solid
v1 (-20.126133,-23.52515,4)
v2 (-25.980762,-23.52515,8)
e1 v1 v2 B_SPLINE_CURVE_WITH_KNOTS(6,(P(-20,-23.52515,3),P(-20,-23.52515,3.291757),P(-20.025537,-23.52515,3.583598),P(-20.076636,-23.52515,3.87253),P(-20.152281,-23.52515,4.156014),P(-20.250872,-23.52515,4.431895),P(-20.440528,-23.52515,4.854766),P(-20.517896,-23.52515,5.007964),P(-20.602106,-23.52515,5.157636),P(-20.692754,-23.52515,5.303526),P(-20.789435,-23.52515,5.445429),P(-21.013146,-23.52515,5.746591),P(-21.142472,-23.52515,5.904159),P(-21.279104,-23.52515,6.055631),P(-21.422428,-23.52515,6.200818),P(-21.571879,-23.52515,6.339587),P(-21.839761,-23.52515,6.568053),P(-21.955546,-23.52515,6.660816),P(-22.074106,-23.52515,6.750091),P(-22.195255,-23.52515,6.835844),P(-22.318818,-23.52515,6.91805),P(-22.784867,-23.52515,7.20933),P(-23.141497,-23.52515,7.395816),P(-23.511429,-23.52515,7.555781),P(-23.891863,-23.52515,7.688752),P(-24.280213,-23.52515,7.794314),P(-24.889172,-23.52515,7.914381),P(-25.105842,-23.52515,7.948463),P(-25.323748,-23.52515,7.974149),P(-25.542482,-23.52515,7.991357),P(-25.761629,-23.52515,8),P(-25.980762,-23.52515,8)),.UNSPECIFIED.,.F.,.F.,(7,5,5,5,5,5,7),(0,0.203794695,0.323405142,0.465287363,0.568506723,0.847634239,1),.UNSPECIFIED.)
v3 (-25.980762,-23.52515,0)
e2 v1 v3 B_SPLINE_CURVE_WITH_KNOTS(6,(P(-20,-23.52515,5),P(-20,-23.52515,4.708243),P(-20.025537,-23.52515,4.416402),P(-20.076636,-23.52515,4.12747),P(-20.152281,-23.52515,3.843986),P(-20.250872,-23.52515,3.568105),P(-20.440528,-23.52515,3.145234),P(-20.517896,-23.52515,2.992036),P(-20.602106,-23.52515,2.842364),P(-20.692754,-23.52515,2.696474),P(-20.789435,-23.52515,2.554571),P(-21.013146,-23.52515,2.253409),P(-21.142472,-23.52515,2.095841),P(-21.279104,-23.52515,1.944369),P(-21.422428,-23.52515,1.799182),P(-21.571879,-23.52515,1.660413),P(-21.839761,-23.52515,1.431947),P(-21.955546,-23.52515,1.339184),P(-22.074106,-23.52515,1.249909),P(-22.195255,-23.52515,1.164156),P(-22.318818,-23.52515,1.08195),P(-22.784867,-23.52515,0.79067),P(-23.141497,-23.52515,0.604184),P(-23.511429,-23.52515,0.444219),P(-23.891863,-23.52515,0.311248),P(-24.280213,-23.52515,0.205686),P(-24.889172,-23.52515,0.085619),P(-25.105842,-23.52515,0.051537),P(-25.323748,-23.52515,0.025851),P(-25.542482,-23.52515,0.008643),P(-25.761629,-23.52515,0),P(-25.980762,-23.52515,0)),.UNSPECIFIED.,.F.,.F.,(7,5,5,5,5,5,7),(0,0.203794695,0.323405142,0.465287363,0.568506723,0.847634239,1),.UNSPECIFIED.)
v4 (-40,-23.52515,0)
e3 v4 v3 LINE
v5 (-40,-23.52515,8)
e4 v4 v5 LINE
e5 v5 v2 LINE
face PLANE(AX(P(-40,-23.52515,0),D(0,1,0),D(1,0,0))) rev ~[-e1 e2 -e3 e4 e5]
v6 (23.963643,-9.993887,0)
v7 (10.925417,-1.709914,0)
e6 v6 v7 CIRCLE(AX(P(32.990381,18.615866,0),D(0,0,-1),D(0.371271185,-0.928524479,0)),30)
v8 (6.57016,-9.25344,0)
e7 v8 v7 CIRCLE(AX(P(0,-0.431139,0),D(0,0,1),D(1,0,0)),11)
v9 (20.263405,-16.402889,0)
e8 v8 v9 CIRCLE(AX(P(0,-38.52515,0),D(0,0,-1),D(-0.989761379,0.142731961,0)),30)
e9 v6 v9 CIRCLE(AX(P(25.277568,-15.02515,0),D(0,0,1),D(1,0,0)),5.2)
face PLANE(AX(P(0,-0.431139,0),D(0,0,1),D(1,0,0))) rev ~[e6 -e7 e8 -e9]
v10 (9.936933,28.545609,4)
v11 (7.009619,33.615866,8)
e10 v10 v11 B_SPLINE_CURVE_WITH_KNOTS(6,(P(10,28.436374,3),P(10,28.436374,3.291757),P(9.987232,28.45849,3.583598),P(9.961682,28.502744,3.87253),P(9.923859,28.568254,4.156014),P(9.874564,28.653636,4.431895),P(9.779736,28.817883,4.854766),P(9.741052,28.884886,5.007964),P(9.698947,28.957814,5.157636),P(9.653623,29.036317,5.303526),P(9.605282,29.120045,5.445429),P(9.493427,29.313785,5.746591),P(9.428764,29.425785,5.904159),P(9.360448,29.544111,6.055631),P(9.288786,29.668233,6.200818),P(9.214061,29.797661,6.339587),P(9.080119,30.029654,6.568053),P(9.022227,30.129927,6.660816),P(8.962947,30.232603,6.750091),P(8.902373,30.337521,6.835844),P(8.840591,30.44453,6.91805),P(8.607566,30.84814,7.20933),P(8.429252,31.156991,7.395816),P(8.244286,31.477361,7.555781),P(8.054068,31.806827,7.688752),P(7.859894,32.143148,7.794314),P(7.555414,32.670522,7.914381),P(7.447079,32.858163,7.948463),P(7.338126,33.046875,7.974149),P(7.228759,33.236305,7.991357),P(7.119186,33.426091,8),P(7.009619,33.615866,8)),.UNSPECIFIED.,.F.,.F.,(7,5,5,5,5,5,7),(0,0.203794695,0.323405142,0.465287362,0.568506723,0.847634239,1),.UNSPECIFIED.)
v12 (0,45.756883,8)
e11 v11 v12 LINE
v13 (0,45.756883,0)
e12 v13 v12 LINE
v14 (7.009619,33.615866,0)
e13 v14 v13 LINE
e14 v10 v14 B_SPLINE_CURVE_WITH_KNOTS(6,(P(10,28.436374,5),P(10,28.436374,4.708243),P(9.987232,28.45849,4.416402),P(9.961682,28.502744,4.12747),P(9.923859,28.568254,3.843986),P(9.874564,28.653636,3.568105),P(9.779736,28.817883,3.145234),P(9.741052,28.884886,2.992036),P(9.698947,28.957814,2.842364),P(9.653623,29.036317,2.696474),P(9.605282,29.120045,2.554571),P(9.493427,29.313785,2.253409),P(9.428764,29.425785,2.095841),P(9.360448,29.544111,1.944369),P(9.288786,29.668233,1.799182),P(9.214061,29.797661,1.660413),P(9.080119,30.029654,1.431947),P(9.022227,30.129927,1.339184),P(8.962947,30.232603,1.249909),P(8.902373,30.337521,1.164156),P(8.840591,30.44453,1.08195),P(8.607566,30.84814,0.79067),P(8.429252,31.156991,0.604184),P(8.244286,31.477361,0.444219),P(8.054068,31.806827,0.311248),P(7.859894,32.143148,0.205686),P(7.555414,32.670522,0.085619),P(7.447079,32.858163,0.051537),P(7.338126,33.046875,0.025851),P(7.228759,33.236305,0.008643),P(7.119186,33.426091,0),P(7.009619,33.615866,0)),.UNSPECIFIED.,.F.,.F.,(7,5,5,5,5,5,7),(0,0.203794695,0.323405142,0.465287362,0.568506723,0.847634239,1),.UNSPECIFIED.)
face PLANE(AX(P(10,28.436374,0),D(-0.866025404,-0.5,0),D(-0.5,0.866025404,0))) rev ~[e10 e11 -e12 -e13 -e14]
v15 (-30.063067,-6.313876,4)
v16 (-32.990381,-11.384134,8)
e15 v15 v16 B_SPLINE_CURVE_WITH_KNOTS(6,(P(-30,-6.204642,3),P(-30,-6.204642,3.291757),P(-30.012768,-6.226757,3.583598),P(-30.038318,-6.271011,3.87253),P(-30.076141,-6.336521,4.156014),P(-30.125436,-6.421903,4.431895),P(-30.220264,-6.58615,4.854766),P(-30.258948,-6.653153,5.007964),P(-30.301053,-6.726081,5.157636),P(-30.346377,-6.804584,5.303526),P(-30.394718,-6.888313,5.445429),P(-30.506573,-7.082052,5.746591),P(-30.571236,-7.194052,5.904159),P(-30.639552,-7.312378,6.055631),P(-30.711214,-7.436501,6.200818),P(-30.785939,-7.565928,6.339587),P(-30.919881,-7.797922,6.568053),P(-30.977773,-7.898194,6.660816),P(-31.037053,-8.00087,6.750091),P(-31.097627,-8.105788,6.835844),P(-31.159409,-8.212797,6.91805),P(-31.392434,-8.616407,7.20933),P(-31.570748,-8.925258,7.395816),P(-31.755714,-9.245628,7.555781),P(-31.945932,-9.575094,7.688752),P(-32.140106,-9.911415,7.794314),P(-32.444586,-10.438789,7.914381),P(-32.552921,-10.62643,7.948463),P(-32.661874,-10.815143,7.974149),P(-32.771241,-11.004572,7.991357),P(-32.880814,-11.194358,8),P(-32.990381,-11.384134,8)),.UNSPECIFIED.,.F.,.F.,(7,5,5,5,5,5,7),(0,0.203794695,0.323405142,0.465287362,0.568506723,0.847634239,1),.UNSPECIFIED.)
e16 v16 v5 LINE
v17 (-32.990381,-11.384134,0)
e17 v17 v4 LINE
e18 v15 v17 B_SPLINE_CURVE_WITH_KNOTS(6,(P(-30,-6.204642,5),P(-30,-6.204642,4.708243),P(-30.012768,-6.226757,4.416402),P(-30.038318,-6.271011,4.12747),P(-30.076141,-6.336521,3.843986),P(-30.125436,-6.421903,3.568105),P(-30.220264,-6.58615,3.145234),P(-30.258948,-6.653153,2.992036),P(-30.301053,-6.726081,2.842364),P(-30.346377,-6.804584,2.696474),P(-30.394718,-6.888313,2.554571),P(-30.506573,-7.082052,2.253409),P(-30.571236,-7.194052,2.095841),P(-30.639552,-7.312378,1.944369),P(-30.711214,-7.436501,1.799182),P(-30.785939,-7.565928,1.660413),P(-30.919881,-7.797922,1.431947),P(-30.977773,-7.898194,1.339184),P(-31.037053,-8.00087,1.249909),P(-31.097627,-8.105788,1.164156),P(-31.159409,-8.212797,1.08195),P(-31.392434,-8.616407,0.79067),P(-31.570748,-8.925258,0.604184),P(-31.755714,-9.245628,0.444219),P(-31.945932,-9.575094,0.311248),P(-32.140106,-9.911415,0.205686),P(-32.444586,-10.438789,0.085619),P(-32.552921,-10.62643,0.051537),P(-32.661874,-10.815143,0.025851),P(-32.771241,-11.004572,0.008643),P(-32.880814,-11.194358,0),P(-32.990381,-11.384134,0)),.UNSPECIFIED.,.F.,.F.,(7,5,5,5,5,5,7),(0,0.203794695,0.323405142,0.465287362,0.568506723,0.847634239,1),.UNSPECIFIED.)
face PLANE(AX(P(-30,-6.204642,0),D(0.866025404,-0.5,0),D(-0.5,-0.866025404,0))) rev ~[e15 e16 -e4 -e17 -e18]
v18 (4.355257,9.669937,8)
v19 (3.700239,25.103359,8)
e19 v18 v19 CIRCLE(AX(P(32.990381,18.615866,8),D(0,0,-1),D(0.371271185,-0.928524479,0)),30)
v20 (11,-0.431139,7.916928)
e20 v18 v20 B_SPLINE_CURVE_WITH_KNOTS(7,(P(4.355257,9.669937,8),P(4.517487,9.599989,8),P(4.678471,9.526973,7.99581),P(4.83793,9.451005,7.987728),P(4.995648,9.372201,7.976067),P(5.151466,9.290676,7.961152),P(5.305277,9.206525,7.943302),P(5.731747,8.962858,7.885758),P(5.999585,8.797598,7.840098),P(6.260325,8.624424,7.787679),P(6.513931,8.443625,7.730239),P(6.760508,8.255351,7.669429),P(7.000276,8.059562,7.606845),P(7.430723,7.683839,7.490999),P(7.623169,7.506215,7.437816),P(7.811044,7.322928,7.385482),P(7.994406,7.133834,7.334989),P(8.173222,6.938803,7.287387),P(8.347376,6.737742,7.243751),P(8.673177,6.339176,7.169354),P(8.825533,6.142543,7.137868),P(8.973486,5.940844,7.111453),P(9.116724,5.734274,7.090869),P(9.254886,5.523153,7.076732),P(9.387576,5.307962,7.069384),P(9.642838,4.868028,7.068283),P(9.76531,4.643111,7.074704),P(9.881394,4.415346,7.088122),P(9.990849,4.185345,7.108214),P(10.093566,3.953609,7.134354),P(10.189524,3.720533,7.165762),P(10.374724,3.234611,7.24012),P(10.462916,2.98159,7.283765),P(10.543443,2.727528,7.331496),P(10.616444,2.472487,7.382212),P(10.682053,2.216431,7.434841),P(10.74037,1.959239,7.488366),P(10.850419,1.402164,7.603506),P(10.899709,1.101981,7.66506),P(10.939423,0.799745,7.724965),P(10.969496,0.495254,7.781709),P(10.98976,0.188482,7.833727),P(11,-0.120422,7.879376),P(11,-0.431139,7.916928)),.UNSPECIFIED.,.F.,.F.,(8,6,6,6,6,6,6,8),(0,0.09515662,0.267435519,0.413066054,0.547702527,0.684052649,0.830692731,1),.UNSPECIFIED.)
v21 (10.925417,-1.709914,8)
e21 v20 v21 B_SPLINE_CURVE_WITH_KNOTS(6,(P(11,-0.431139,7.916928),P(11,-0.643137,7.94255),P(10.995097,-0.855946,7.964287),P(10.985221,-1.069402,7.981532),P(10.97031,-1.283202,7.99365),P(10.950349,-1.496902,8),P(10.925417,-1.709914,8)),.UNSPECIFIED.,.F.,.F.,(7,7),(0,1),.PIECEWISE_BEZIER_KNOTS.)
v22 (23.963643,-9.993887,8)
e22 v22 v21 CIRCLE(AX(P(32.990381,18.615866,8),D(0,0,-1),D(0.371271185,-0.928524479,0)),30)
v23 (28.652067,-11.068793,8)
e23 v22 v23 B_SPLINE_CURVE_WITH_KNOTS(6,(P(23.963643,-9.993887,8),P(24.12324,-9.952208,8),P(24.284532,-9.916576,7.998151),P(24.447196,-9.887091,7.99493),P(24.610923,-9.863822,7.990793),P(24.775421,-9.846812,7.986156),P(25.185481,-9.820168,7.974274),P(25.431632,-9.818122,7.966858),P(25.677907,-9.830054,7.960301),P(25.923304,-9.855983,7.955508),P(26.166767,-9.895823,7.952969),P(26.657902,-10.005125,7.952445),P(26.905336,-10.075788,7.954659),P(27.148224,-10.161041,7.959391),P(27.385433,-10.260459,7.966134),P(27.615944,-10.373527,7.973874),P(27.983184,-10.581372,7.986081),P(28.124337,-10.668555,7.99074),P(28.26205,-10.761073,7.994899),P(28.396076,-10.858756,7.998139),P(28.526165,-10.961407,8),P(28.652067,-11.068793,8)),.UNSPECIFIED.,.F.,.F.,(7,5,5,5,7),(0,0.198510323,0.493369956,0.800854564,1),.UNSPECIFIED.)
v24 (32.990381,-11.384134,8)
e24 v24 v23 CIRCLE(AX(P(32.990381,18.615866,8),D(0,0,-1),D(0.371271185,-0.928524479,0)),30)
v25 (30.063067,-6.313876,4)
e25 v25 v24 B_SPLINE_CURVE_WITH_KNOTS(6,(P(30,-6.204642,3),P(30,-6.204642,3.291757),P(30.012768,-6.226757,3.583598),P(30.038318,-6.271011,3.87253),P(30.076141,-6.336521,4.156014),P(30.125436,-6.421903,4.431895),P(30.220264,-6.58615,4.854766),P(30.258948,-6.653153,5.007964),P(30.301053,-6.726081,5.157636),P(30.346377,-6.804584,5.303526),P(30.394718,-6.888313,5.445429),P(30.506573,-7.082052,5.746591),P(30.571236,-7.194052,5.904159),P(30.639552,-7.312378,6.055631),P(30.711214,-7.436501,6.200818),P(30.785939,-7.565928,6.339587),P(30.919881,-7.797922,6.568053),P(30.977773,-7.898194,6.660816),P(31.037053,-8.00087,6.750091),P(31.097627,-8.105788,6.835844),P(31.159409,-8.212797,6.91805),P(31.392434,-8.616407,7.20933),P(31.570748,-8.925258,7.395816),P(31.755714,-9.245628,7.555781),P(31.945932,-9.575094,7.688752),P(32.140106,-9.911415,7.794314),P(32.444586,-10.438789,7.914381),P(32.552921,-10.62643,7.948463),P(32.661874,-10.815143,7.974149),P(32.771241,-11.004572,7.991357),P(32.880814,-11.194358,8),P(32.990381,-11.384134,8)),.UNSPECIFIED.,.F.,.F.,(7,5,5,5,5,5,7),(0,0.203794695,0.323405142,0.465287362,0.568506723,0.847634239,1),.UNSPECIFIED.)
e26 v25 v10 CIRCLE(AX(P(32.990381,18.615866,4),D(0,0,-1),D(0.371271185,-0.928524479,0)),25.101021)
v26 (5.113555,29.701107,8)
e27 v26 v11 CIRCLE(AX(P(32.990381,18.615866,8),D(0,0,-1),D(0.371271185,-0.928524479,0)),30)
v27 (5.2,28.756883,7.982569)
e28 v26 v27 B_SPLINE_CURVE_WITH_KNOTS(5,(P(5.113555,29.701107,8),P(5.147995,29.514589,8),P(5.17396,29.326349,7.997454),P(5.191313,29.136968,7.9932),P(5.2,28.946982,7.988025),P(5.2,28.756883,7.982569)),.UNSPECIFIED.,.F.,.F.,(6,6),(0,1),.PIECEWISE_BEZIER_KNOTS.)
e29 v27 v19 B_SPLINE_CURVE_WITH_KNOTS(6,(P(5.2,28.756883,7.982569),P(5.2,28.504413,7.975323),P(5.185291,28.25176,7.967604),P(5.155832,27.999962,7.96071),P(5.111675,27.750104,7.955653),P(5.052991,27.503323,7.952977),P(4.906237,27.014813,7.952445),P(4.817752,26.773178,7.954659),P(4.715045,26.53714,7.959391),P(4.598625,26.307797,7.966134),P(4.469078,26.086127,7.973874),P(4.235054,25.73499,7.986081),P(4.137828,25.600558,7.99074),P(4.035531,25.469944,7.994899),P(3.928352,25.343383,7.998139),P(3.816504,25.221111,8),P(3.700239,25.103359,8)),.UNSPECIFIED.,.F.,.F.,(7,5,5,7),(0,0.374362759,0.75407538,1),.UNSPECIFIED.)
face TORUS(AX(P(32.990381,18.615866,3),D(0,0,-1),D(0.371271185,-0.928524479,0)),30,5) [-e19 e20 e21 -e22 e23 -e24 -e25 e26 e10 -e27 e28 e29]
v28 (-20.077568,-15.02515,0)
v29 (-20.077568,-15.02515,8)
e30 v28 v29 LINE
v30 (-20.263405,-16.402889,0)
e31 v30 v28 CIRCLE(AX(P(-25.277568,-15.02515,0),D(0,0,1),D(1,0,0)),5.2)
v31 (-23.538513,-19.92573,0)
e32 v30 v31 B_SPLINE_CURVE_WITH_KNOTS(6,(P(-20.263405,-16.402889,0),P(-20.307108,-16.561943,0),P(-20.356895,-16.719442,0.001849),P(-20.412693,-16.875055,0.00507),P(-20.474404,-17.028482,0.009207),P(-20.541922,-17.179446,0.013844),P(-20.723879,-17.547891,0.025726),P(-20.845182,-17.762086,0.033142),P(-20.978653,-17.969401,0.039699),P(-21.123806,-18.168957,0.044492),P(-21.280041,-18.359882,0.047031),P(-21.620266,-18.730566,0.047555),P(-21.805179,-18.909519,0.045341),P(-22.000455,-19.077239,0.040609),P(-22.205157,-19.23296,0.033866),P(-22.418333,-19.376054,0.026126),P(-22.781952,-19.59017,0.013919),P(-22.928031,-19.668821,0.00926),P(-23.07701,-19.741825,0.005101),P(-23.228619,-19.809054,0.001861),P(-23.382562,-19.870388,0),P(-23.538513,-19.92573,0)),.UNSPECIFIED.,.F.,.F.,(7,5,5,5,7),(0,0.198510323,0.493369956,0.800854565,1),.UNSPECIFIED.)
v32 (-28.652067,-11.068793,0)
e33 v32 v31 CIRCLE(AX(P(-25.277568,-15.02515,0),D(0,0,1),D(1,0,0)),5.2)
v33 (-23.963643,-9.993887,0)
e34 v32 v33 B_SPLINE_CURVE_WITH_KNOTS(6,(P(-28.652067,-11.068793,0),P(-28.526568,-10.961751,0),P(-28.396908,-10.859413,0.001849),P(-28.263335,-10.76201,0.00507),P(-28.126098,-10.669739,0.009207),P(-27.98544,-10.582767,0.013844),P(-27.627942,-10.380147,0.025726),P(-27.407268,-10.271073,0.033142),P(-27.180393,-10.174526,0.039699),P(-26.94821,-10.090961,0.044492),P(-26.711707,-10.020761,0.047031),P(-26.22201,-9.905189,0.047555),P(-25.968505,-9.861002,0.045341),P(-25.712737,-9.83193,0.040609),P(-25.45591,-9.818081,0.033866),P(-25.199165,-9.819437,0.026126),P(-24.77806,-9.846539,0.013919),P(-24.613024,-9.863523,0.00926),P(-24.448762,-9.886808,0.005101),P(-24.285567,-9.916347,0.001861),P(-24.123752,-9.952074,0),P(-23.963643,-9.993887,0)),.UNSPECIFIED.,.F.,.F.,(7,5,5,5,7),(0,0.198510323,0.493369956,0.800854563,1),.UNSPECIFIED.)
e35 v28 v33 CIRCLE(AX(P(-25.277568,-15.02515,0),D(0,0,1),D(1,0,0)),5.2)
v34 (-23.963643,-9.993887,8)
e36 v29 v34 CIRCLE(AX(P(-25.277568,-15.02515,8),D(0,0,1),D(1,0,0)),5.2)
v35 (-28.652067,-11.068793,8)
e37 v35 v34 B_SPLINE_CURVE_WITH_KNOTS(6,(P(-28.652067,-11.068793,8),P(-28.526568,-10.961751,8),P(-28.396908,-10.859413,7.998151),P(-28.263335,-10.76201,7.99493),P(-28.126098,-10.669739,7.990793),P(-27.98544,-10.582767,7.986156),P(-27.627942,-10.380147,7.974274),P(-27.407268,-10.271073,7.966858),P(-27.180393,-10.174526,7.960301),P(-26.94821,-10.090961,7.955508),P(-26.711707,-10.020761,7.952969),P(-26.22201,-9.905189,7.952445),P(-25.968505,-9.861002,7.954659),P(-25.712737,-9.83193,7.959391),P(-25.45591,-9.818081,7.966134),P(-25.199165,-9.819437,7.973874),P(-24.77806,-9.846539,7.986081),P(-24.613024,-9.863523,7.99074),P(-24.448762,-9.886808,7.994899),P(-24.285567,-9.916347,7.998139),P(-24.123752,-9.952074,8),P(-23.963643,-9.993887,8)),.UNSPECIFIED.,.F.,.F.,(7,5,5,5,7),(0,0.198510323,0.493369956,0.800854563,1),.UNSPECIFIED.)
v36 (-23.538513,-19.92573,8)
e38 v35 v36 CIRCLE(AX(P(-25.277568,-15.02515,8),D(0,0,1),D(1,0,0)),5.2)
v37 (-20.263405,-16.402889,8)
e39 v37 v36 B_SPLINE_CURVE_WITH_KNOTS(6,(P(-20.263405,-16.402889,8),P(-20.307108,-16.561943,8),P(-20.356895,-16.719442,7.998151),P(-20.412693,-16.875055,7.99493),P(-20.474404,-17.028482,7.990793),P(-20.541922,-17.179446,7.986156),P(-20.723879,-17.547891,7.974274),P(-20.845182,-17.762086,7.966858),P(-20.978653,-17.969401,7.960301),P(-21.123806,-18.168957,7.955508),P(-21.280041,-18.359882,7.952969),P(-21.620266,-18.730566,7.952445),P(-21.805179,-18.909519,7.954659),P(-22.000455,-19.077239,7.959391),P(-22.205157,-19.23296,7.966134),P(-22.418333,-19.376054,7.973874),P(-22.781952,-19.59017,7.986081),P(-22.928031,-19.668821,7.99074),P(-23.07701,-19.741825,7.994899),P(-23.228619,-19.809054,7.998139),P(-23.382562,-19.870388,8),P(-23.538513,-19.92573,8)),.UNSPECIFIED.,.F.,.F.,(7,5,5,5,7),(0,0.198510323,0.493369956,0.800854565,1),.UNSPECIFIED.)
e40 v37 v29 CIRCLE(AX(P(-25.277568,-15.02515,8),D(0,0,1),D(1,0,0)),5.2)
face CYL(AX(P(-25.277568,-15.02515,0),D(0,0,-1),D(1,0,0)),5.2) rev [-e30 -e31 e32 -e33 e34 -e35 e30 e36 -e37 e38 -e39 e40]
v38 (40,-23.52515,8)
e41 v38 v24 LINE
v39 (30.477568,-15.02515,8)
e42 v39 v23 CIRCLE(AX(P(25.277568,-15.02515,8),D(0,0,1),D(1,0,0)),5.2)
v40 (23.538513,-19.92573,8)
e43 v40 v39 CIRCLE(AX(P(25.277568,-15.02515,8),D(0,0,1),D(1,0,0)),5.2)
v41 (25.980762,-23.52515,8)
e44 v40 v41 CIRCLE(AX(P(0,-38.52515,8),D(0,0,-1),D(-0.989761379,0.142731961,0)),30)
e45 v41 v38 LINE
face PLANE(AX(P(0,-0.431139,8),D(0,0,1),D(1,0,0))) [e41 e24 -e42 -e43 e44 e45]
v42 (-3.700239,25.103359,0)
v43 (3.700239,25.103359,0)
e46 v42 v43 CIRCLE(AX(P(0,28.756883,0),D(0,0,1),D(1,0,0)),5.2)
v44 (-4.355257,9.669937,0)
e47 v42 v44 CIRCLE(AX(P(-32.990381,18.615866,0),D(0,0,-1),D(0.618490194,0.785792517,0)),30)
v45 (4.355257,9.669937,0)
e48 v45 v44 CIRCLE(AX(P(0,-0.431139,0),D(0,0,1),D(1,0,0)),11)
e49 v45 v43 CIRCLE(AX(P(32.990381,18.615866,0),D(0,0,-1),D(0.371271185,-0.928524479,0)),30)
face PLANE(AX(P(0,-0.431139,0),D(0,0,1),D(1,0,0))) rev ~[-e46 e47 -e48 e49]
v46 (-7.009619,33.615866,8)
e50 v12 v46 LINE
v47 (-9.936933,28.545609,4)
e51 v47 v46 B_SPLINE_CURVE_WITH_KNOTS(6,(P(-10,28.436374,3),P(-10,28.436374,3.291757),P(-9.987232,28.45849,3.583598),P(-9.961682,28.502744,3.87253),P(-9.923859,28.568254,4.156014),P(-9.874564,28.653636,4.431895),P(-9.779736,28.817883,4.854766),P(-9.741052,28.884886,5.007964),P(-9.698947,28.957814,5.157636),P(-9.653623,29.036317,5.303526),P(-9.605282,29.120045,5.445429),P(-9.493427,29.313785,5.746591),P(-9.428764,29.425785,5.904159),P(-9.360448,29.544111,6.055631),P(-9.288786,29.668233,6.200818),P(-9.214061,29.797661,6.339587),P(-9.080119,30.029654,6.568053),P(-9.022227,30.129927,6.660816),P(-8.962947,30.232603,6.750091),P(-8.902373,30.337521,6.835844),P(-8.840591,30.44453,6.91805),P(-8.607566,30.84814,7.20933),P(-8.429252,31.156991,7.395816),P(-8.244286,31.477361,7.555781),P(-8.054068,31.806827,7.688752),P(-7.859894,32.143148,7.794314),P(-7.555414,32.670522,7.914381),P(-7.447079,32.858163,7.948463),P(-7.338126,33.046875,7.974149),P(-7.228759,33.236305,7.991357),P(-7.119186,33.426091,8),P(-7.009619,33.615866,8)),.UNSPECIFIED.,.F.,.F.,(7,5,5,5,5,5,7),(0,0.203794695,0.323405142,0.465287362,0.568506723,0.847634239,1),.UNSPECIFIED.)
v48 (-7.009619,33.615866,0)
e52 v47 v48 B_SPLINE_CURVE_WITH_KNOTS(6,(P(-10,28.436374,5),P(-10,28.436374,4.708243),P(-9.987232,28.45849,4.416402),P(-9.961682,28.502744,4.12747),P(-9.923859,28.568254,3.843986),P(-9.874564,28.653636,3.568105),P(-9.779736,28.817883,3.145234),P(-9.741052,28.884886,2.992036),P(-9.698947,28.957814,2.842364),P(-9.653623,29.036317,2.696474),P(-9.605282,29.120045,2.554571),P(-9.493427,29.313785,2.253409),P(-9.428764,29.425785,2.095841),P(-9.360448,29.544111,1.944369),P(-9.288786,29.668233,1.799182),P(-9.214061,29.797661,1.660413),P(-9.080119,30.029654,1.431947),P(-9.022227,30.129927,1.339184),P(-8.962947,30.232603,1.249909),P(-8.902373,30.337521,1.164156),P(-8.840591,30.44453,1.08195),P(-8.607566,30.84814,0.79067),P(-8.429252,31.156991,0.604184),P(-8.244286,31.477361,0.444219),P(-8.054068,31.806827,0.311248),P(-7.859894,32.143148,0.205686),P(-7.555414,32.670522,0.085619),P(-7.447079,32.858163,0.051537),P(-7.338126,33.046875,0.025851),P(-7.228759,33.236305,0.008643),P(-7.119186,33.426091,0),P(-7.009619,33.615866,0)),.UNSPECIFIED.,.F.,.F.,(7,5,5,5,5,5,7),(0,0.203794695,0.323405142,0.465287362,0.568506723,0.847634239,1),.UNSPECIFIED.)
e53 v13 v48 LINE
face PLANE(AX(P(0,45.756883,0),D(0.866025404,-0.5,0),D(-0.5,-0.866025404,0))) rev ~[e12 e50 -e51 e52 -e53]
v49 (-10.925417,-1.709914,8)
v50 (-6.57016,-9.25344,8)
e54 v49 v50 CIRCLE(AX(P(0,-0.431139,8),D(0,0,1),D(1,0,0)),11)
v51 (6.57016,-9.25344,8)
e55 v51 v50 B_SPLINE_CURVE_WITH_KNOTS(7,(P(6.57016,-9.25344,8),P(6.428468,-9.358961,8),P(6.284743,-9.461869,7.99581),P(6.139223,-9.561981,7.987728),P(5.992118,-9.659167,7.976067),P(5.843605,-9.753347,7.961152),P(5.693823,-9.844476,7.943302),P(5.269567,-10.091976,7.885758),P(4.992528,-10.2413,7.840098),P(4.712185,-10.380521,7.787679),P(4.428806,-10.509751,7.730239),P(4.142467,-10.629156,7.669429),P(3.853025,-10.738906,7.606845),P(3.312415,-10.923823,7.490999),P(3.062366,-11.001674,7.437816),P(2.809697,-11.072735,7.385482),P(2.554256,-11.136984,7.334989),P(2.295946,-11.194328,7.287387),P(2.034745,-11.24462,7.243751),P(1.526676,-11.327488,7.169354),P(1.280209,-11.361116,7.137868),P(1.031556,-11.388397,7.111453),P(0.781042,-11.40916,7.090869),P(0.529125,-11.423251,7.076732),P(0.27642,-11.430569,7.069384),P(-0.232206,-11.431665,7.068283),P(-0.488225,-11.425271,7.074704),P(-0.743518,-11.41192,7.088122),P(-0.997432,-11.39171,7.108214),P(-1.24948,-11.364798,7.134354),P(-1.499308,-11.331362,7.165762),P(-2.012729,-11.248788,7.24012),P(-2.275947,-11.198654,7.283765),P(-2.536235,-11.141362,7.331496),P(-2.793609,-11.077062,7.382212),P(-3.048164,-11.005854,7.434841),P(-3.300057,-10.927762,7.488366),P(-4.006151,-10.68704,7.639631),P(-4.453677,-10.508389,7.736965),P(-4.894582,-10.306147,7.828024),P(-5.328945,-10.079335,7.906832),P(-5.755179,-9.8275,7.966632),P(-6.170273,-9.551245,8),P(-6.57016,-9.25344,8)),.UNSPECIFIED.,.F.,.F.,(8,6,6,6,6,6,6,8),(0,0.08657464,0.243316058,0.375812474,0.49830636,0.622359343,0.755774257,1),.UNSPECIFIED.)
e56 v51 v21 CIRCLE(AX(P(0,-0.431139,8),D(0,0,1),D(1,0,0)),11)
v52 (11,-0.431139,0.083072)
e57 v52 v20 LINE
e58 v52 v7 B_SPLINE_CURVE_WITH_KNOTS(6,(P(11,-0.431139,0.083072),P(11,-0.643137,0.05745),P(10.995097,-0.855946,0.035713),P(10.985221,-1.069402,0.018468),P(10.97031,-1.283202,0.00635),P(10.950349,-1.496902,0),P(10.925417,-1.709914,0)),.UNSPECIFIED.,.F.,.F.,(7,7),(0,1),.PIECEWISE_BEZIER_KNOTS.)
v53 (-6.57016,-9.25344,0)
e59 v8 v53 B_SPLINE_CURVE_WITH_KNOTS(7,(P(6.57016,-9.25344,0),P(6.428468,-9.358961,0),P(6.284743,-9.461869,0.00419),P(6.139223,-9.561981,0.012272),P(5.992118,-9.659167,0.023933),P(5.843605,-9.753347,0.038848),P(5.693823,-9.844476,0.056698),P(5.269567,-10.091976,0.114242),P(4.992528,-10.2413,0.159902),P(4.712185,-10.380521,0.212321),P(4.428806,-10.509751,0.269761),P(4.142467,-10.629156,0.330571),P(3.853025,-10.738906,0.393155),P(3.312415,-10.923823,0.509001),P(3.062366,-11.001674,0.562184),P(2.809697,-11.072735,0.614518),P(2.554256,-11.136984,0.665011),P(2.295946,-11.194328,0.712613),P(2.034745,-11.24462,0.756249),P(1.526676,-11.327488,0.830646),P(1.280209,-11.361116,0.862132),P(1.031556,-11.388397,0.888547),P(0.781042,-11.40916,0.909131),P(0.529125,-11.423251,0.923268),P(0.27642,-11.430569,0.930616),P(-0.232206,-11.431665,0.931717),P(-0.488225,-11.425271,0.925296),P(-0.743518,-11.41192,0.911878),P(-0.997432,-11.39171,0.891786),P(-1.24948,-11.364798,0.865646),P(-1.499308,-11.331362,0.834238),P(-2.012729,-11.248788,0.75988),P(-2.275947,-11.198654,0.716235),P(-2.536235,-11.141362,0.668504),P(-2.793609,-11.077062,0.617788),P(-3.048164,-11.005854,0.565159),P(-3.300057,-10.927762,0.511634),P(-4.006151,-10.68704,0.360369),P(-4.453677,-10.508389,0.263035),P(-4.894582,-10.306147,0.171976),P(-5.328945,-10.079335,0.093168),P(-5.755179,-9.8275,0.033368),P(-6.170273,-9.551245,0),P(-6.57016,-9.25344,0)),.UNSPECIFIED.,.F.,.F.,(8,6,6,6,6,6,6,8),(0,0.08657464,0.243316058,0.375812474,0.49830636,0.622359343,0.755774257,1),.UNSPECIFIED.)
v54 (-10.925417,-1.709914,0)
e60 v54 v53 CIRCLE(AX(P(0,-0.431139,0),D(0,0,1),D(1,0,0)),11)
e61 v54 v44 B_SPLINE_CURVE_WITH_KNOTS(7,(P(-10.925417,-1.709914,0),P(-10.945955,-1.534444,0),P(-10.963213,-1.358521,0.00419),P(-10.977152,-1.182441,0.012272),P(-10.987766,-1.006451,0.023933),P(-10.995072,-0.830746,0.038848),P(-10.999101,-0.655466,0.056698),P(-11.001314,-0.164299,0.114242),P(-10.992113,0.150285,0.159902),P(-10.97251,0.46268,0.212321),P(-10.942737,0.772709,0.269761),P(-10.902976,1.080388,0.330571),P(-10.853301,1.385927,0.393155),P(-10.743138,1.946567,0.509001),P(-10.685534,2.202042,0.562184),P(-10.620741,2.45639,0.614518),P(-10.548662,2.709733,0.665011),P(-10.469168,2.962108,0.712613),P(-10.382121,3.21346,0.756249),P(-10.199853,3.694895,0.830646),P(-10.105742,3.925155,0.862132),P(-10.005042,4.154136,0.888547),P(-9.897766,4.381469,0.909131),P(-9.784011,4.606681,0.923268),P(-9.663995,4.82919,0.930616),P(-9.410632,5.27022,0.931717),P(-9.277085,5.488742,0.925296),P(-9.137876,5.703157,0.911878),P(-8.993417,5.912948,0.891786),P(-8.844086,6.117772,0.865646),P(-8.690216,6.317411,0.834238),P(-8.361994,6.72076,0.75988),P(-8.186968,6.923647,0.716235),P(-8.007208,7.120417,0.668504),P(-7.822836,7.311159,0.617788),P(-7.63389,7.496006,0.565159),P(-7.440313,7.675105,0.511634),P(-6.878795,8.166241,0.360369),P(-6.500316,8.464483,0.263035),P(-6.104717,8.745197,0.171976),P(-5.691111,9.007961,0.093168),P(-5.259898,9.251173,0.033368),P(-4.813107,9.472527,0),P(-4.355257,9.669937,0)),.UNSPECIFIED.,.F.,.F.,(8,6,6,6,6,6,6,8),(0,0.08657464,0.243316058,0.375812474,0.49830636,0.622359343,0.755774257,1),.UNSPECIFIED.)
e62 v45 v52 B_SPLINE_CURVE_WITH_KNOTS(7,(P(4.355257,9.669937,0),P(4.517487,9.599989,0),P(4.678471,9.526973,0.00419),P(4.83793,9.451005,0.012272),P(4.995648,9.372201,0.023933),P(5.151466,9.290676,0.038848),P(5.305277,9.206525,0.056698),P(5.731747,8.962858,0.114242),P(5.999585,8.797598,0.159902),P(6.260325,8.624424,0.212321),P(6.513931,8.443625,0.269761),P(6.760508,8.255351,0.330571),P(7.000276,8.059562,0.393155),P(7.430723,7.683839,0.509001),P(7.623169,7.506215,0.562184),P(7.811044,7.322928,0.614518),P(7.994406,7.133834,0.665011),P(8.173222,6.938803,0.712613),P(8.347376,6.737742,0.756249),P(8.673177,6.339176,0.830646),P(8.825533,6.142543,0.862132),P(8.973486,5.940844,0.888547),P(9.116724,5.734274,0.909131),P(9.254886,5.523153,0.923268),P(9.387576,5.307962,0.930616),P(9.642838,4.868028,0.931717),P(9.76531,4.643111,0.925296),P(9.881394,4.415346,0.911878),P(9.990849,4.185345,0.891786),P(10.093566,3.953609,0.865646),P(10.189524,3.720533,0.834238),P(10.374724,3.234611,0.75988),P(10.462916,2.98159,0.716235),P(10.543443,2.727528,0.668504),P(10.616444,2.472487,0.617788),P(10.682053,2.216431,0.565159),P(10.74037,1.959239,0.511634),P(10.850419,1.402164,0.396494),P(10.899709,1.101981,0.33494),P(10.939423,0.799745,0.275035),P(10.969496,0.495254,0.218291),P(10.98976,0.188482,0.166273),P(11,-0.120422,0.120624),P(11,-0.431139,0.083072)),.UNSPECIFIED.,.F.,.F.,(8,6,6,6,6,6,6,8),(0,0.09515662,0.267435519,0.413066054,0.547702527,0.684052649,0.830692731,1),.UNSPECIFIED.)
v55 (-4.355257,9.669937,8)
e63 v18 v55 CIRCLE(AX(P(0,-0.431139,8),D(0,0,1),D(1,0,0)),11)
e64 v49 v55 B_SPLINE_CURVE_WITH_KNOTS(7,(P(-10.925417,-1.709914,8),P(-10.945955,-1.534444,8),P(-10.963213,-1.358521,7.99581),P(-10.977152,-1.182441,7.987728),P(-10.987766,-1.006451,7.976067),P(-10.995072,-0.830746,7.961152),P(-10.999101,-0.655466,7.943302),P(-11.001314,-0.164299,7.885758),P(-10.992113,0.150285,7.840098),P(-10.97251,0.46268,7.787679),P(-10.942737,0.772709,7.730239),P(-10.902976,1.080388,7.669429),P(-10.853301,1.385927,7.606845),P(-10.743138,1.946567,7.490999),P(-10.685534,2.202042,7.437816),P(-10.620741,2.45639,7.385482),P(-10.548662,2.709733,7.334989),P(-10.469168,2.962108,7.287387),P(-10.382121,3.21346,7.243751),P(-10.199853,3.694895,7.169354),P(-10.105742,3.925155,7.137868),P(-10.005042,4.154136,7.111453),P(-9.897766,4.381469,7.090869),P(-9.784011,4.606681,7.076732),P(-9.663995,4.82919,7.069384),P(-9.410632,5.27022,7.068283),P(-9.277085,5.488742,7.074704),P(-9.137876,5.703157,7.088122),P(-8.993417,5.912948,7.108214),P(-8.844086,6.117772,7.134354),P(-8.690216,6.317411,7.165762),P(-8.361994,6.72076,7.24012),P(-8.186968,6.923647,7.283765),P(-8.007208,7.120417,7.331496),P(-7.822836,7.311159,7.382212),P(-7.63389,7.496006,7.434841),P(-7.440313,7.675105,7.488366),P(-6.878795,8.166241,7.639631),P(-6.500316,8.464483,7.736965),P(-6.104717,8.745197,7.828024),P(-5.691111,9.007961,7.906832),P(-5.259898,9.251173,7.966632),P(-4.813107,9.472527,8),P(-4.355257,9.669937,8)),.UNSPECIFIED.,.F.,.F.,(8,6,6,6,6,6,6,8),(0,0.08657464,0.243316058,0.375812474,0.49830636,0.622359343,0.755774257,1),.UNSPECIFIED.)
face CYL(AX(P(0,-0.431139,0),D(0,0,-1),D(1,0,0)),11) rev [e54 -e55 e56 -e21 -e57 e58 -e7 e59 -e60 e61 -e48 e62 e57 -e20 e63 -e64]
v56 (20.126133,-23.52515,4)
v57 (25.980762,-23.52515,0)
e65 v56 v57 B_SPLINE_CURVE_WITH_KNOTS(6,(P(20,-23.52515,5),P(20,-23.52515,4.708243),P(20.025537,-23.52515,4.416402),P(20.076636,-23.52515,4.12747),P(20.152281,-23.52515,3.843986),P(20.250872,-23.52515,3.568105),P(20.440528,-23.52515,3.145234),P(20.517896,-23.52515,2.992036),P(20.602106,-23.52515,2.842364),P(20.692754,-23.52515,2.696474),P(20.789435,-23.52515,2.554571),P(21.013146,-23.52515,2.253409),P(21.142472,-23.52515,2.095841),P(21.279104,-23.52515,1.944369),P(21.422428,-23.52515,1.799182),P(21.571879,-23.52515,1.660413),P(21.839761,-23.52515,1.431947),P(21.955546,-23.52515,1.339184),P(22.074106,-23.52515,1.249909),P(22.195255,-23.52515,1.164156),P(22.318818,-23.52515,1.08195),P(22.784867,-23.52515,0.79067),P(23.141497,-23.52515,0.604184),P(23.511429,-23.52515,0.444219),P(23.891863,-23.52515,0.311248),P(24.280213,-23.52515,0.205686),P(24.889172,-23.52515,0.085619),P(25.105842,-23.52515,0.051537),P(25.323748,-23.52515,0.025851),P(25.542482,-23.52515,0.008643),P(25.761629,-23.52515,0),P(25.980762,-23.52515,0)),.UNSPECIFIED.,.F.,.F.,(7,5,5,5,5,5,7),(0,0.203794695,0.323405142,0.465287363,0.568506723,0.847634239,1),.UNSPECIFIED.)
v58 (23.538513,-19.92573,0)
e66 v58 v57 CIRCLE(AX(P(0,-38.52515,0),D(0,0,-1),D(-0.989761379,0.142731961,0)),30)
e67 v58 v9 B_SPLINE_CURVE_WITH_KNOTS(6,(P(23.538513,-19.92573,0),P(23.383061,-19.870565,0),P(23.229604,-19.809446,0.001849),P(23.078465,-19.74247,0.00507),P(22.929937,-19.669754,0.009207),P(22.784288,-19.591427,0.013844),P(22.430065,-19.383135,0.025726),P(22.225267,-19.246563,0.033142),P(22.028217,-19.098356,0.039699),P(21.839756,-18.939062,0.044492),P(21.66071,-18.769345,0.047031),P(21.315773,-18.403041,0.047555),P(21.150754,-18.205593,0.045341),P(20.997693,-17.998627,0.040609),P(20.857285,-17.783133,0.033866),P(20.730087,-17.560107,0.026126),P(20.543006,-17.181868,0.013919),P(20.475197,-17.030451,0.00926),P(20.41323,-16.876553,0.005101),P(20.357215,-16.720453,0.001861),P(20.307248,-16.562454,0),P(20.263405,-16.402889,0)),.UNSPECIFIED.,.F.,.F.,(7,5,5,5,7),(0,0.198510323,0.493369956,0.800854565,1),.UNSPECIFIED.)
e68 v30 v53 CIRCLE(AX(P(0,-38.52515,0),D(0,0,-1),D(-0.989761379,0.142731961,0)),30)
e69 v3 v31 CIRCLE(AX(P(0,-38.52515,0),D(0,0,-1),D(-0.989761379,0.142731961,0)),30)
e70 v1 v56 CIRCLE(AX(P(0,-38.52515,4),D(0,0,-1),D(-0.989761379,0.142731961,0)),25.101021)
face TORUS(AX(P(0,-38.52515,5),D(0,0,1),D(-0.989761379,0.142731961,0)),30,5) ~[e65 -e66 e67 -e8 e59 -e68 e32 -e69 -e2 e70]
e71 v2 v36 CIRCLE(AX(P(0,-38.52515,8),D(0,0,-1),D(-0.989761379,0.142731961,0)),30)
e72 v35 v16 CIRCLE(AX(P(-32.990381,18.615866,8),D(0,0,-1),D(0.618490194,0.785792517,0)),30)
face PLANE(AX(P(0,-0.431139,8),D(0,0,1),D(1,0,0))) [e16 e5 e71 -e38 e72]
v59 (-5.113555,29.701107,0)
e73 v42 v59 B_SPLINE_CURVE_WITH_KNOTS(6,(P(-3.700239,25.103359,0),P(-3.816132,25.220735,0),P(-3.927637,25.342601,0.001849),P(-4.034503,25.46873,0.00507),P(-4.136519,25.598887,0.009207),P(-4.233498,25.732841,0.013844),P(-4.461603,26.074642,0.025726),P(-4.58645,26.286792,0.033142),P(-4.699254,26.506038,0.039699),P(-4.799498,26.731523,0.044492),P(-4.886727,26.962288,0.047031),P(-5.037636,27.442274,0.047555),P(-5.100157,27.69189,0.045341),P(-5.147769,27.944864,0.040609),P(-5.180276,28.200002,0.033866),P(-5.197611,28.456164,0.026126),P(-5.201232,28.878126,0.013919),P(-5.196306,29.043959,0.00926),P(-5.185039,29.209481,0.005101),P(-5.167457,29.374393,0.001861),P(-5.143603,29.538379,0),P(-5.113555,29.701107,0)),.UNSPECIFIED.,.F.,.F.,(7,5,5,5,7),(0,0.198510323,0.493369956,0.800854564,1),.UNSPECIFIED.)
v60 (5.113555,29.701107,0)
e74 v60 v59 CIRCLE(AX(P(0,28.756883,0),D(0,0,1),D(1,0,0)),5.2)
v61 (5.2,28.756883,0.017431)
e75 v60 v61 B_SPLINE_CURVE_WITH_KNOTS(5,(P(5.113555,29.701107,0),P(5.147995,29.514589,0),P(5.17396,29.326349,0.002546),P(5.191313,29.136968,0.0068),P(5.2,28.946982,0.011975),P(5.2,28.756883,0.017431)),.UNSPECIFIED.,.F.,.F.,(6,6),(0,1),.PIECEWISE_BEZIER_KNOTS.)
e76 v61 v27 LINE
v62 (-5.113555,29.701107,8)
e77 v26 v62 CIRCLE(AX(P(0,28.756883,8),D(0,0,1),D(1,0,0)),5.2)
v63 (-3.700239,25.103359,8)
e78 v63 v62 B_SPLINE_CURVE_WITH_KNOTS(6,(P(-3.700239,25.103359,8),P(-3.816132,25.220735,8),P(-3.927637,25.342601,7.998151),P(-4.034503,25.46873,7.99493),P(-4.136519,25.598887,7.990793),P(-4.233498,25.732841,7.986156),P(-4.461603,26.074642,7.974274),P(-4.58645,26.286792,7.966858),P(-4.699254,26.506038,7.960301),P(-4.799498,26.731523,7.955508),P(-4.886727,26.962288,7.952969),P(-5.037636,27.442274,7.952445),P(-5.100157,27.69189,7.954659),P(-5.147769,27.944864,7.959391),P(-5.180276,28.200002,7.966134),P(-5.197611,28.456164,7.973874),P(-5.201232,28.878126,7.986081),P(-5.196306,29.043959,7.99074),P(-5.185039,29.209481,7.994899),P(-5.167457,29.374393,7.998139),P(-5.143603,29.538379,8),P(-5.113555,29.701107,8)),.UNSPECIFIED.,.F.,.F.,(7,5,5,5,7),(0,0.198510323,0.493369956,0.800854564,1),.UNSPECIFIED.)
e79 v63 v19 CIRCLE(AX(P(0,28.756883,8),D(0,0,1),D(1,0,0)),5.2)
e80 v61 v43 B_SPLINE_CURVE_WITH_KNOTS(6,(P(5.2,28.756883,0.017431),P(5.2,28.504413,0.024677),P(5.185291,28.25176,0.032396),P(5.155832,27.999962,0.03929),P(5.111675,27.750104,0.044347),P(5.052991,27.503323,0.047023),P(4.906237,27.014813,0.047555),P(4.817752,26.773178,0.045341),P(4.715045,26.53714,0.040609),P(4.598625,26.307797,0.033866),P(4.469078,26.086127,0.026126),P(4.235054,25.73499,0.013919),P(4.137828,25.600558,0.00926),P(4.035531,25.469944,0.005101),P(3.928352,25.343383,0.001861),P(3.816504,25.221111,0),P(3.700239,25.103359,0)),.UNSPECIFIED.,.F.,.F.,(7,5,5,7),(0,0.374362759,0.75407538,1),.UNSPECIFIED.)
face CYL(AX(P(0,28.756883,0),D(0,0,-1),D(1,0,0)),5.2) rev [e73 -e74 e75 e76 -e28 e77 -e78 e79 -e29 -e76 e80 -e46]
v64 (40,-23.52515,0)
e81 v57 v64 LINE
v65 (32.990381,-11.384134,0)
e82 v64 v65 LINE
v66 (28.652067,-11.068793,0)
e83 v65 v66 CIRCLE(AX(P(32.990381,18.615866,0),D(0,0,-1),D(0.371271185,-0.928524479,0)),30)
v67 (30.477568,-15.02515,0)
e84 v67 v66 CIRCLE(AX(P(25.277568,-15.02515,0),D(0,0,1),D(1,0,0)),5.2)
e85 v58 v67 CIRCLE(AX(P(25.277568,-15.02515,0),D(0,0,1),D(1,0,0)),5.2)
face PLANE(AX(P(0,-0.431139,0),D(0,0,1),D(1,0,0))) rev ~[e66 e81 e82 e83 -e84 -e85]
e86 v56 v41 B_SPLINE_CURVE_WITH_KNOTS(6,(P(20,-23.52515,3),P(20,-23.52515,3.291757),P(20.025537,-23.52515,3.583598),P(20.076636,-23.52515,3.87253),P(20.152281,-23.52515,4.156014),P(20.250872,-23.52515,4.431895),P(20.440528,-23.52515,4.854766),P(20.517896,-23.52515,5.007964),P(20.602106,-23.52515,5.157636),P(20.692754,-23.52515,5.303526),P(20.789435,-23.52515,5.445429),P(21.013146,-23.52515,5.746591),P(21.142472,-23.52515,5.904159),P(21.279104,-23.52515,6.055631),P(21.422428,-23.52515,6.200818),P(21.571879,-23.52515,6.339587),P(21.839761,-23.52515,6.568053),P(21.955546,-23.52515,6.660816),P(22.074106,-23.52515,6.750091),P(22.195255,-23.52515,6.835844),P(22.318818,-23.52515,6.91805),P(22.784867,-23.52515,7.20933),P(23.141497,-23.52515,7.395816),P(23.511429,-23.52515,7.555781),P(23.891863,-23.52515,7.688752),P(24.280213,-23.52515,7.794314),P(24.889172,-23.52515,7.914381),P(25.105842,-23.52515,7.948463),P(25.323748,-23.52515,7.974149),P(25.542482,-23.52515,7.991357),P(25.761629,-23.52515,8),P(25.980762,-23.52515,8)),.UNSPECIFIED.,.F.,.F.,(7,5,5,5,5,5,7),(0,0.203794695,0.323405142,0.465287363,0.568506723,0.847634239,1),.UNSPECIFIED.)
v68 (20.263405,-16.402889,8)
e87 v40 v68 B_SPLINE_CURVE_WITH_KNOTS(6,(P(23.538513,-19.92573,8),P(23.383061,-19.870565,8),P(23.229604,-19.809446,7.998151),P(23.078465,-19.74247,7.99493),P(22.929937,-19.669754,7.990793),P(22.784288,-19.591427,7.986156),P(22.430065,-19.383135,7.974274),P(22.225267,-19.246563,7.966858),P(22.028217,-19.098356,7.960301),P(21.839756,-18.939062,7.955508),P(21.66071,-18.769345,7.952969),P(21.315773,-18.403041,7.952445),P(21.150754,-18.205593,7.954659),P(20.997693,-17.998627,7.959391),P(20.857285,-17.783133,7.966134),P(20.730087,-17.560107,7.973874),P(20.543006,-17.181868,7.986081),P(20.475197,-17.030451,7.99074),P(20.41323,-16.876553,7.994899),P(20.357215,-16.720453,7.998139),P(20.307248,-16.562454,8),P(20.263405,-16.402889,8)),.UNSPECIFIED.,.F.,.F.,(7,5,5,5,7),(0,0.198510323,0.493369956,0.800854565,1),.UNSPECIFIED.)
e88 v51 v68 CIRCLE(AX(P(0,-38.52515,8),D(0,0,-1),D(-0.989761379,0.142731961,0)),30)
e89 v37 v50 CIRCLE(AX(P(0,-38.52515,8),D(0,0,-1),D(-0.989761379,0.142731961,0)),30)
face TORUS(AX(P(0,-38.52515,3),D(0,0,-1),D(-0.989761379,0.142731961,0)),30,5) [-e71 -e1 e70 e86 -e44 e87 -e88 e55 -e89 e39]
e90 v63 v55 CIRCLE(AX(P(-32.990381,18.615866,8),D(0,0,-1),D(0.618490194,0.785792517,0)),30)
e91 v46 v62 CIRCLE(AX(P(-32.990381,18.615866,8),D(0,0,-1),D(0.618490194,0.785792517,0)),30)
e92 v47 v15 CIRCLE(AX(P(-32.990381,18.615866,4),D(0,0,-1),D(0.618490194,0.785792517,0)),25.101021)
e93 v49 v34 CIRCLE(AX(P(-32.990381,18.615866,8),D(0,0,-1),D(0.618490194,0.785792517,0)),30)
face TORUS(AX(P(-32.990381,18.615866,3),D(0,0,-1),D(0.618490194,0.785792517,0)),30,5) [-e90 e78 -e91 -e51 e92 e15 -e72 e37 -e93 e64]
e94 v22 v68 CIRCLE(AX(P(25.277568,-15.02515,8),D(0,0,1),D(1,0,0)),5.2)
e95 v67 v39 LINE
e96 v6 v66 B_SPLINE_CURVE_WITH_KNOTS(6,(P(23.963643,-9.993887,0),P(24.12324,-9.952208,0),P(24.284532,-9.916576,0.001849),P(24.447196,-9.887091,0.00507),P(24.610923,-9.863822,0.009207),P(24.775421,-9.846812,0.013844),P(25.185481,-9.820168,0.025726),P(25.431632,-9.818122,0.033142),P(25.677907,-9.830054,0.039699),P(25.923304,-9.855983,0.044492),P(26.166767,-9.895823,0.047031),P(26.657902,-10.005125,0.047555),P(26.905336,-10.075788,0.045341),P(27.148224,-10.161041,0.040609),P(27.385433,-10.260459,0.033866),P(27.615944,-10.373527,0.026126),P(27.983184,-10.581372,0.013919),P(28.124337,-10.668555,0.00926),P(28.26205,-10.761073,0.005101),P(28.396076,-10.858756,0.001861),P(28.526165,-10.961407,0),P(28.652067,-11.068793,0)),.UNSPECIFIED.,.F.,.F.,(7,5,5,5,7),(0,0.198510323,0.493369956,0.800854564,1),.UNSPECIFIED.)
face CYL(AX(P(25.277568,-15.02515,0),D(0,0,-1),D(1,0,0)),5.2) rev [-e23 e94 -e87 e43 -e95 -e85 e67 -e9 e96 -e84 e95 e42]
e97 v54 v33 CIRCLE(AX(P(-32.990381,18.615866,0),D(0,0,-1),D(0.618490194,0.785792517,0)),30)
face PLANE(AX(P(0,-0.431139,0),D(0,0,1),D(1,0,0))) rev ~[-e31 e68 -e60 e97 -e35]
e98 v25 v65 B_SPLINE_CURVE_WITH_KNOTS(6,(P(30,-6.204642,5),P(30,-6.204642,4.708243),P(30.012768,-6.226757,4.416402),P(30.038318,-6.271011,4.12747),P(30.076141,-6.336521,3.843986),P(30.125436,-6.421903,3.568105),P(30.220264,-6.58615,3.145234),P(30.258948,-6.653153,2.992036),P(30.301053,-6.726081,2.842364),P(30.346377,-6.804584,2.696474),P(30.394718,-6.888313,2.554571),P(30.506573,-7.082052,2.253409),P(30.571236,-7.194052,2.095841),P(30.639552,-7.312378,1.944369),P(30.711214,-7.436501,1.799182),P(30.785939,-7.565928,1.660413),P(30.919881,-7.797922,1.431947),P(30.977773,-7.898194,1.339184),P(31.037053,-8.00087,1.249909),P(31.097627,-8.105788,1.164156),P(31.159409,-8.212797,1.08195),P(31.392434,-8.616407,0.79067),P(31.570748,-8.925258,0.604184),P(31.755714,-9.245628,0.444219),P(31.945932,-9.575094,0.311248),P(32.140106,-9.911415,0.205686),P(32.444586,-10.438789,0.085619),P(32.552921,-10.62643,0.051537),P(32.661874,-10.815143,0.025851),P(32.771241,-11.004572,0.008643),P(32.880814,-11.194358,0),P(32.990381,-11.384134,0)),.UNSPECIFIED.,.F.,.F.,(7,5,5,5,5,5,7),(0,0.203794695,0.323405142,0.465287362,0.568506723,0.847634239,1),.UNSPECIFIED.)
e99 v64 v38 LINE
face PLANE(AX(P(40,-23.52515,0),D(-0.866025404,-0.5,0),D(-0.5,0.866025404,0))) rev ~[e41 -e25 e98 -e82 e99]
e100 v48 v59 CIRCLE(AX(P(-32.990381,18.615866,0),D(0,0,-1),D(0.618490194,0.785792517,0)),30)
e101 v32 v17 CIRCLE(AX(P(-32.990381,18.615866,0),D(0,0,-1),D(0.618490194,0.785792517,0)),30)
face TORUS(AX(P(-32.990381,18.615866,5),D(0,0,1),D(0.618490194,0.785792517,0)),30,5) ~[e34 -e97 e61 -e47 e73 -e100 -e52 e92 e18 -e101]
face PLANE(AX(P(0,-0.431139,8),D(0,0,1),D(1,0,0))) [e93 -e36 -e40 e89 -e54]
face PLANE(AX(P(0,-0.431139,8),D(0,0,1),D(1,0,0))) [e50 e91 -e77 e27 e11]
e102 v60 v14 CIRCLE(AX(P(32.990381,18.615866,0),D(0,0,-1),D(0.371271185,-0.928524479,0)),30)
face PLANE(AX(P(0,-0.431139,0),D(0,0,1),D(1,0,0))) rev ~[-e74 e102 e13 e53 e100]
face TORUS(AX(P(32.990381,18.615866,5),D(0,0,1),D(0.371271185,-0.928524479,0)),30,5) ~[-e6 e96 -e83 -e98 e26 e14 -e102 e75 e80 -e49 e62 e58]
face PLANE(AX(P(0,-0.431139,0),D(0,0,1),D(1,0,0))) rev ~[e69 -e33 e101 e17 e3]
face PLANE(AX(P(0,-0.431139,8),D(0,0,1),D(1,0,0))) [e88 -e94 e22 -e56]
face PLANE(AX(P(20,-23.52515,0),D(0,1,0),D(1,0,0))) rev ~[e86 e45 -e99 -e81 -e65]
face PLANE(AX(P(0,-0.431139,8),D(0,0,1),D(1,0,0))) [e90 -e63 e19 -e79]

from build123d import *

# Parameters (mm, degrees)
F0_R         = 5.2
F0_R_2       = 11
F1_DEPTH     = 8
F2_T2_ANGLE  = 163.5880718536
F2_T4_ANGLE  = 163.5880718536
F2_T6_ANGLE  = 163.5880718536
F2_T8_ANGLE  = 163.5880718536
F2_T10_ANGLE = 163.5880718536
F2_T12_ANGLE = 163.5880718536


# Not quite as in the source:
# - a fillet or chamfer that OpenCascade refuses, or shapes differently, is made with other operations: its cross-section is extruded or revolved along the edge and cut away or added


with BuildPart() as f1:
    # F0 (on Top) → F1 (new body)
    with BuildSketch(Plane.XY):
        with BuildLine():
            Line((10, 28.4363744997), (0, 45.7568825754))
            Line((0, 45.7568825754), (-10, 28.4363744997))
            ThreePointArc((-10, 28.4363744997), (-11.3397459622, 6.115866424), (-30, -6.2046416517))
            Line((-30, -6.2046416517), (-40, -23.5251497274))
            Line((-40, -23.5251497274), (-20, -23.5251497274))
            ThreePointArc((-20, -23.5251497274), (0, -13.5251497274), (20, -23.5251497274))
            Line((20, -23.5251497274), (40, -23.5251497274))
            Line((40, -23.5251497274), (30, -6.2046416517))
            ThreePointArc((30, -6.2046416517), (11.3397459622, 6.115866424), (10, 28.4363744997))
        make_face()
        with Locations((-25.2775681357, -15.0251497274)):
            Circle(F0_R, mode=Mode.SUBTRACT)
        with Locations((25.2775681357, -15.0251497274)):
            Circle(F0_R, mode=Mode.SUBTRACT)
        with Locations((0, -0.4311389598)):
            Circle(F0_R_2, mode=Mode.SUBTRACT)
        with Locations((0, 28.7568825754)):
            Circle(F0_R, mode=Mode.SUBTRACT)
    extrude(amount=F1_DEPTH)

    # F2: fillet of radius 5 on 6 edges, made by hand

    # F2_s1 → F2_t2 (revolve, cut)
    with BuildSketch(Plane(origin=(-29.4179701652, 23.1546186531, 0), x_dir=(0, 0, 1), z_dir=(-0.7857925171, 0.618490194, 0))):
        with BuildLine():
            ThreePointArc((3, 19.2239813561), (6.5355339059, 20.6884474501), (8, 24.2239813561))
            Line((8, 24.2239813561), (8, 19.2239813561))
            Line((8, 19.2239813561), (3, 19.2239813561))
        make_face()
    revolve(axis=Axis((-32.9903810568, 18.615866424, 8), (0, 0, -1)), revolution_arc=F2_T2_ANGLE, mode=Mode.SUBTRACT)

    # F2_s3 → F2_t4 (revolve, cut)
    with BuildSketch(Plane(origin=(34.8604405257, 13.9389723807, 0), x_dir=(0, 0, 1), z_dir=(0.9285244785, 0.3712711849, 0))):
        with BuildLine():
            ThreePointArc((3, 19.9630902024), (6.5355339059, 21.4275562964), (8, 24.9630902024))
            Line((8, 24.9630902024), (8, 19.9630902024))
            Line((8, 19.9630902024), (3, 19.9630902024))
        make_face()
    revolve(axis=Axis((32.9903810568, 18.615866424, 8), (0, 0, -1)), revolution_arc=F2_T4_ANGLE, mode=Mode.SUBTRACT)

    # F2_s5 → F2_t6 (revolve, cut)
    with BuildSketch(Plane(origin=(-5.4424703605, -37.7402994735, 0), x_dir=(0, 0, 1), z_dir=(-0.1427319614, -0.9897613789, 0))):
        with BuildLine():
            ThreePointArc((3, 19.5012298151), (6.5355339059, 20.9656959092), (8, 24.5012298151))
            Line((8, 24.5012298151), (8, 19.5012298151))
            Line((8, 19.5012298151), (3, 19.5012298151))
        make_face()
    revolve(axis=Axis((0, -38.5251497274, 8), (0, 0, -1)), revolution_arc=F2_T6_ANGLE, mode=Mode.SUBTRACT)

    # F2_s7 → F2_t8 (revolve, cut)
    with BuildSketch(Plane(origin=(-29.4179701652, 23.1546186531, 0), x_dir=(0, 0, 1), z_dir=(-0.7857925171, 0.618490194, 0))):
        with BuildLine():
            ThreePointArc((5, 19.2239813561), (1.4644660941, 20.6884474501), (0, 24.2239813561))
            Line((0, 24.2239813561), (0, 19.2239813561))
            Line((0, 19.2239813561), (5, 19.2239813561))
        make_face()
    revolve(axis=Axis((-32.9903810568, 18.615866424, 0), (0, 0, -1)), revolution_arc=F2_T8_ANGLE, mode=Mode.SUBTRACT)

    # F2_s9 → F2_t10 (revolve, cut)
    with BuildSketch(Plane(origin=(34.8604405257, 13.9389723807, 0), x_dir=(0, 0, 1), z_dir=(0.9285244785, 0.3712711849, 0))):
        with BuildLine():
            ThreePointArc((5, 19.9630902024), (1.4644660941, 21.4275562964), (0, 24.9630902024))
            Line((0, 24.9630902024), (0, 19.9630902024))
            Line((0, 19.9630902024), (5, 19.9630902024))
        make_face()
    revolve(axis=Axis((32.9903810568, 18.615866424, 0), (0, 0, -1)), revolution_arc=F2_T10_ANGLE, mode=Mode.SUBTRACT)

    # F2_s11 → F2_t12 (revolve, cut)
    with BuildSketch(Plane(origin=(-5.4424703605, -37.7402994735, 0), x_dir=(0, 0, 1), z_dir=(-0.1427319614, -0.9897613789, 0))):
        with BuildLine():
            ThreePointArc((5, 19.5012298151), (1.4644660941, 20.9656959092), (0, 24.5012298151))
            Line((0, 24.5012298151), (0, 19.5012298151))
            Line((0, 19.5012298151), (5, 19.5012298151))
        make_face()
    revolve(axis=Axis((0, -38.5251497274, 0), (0, 0, -1)), revolution_arc=F2_T12_ANGLE, mode=Mode.SUBTRACT)


solid = f1.part
